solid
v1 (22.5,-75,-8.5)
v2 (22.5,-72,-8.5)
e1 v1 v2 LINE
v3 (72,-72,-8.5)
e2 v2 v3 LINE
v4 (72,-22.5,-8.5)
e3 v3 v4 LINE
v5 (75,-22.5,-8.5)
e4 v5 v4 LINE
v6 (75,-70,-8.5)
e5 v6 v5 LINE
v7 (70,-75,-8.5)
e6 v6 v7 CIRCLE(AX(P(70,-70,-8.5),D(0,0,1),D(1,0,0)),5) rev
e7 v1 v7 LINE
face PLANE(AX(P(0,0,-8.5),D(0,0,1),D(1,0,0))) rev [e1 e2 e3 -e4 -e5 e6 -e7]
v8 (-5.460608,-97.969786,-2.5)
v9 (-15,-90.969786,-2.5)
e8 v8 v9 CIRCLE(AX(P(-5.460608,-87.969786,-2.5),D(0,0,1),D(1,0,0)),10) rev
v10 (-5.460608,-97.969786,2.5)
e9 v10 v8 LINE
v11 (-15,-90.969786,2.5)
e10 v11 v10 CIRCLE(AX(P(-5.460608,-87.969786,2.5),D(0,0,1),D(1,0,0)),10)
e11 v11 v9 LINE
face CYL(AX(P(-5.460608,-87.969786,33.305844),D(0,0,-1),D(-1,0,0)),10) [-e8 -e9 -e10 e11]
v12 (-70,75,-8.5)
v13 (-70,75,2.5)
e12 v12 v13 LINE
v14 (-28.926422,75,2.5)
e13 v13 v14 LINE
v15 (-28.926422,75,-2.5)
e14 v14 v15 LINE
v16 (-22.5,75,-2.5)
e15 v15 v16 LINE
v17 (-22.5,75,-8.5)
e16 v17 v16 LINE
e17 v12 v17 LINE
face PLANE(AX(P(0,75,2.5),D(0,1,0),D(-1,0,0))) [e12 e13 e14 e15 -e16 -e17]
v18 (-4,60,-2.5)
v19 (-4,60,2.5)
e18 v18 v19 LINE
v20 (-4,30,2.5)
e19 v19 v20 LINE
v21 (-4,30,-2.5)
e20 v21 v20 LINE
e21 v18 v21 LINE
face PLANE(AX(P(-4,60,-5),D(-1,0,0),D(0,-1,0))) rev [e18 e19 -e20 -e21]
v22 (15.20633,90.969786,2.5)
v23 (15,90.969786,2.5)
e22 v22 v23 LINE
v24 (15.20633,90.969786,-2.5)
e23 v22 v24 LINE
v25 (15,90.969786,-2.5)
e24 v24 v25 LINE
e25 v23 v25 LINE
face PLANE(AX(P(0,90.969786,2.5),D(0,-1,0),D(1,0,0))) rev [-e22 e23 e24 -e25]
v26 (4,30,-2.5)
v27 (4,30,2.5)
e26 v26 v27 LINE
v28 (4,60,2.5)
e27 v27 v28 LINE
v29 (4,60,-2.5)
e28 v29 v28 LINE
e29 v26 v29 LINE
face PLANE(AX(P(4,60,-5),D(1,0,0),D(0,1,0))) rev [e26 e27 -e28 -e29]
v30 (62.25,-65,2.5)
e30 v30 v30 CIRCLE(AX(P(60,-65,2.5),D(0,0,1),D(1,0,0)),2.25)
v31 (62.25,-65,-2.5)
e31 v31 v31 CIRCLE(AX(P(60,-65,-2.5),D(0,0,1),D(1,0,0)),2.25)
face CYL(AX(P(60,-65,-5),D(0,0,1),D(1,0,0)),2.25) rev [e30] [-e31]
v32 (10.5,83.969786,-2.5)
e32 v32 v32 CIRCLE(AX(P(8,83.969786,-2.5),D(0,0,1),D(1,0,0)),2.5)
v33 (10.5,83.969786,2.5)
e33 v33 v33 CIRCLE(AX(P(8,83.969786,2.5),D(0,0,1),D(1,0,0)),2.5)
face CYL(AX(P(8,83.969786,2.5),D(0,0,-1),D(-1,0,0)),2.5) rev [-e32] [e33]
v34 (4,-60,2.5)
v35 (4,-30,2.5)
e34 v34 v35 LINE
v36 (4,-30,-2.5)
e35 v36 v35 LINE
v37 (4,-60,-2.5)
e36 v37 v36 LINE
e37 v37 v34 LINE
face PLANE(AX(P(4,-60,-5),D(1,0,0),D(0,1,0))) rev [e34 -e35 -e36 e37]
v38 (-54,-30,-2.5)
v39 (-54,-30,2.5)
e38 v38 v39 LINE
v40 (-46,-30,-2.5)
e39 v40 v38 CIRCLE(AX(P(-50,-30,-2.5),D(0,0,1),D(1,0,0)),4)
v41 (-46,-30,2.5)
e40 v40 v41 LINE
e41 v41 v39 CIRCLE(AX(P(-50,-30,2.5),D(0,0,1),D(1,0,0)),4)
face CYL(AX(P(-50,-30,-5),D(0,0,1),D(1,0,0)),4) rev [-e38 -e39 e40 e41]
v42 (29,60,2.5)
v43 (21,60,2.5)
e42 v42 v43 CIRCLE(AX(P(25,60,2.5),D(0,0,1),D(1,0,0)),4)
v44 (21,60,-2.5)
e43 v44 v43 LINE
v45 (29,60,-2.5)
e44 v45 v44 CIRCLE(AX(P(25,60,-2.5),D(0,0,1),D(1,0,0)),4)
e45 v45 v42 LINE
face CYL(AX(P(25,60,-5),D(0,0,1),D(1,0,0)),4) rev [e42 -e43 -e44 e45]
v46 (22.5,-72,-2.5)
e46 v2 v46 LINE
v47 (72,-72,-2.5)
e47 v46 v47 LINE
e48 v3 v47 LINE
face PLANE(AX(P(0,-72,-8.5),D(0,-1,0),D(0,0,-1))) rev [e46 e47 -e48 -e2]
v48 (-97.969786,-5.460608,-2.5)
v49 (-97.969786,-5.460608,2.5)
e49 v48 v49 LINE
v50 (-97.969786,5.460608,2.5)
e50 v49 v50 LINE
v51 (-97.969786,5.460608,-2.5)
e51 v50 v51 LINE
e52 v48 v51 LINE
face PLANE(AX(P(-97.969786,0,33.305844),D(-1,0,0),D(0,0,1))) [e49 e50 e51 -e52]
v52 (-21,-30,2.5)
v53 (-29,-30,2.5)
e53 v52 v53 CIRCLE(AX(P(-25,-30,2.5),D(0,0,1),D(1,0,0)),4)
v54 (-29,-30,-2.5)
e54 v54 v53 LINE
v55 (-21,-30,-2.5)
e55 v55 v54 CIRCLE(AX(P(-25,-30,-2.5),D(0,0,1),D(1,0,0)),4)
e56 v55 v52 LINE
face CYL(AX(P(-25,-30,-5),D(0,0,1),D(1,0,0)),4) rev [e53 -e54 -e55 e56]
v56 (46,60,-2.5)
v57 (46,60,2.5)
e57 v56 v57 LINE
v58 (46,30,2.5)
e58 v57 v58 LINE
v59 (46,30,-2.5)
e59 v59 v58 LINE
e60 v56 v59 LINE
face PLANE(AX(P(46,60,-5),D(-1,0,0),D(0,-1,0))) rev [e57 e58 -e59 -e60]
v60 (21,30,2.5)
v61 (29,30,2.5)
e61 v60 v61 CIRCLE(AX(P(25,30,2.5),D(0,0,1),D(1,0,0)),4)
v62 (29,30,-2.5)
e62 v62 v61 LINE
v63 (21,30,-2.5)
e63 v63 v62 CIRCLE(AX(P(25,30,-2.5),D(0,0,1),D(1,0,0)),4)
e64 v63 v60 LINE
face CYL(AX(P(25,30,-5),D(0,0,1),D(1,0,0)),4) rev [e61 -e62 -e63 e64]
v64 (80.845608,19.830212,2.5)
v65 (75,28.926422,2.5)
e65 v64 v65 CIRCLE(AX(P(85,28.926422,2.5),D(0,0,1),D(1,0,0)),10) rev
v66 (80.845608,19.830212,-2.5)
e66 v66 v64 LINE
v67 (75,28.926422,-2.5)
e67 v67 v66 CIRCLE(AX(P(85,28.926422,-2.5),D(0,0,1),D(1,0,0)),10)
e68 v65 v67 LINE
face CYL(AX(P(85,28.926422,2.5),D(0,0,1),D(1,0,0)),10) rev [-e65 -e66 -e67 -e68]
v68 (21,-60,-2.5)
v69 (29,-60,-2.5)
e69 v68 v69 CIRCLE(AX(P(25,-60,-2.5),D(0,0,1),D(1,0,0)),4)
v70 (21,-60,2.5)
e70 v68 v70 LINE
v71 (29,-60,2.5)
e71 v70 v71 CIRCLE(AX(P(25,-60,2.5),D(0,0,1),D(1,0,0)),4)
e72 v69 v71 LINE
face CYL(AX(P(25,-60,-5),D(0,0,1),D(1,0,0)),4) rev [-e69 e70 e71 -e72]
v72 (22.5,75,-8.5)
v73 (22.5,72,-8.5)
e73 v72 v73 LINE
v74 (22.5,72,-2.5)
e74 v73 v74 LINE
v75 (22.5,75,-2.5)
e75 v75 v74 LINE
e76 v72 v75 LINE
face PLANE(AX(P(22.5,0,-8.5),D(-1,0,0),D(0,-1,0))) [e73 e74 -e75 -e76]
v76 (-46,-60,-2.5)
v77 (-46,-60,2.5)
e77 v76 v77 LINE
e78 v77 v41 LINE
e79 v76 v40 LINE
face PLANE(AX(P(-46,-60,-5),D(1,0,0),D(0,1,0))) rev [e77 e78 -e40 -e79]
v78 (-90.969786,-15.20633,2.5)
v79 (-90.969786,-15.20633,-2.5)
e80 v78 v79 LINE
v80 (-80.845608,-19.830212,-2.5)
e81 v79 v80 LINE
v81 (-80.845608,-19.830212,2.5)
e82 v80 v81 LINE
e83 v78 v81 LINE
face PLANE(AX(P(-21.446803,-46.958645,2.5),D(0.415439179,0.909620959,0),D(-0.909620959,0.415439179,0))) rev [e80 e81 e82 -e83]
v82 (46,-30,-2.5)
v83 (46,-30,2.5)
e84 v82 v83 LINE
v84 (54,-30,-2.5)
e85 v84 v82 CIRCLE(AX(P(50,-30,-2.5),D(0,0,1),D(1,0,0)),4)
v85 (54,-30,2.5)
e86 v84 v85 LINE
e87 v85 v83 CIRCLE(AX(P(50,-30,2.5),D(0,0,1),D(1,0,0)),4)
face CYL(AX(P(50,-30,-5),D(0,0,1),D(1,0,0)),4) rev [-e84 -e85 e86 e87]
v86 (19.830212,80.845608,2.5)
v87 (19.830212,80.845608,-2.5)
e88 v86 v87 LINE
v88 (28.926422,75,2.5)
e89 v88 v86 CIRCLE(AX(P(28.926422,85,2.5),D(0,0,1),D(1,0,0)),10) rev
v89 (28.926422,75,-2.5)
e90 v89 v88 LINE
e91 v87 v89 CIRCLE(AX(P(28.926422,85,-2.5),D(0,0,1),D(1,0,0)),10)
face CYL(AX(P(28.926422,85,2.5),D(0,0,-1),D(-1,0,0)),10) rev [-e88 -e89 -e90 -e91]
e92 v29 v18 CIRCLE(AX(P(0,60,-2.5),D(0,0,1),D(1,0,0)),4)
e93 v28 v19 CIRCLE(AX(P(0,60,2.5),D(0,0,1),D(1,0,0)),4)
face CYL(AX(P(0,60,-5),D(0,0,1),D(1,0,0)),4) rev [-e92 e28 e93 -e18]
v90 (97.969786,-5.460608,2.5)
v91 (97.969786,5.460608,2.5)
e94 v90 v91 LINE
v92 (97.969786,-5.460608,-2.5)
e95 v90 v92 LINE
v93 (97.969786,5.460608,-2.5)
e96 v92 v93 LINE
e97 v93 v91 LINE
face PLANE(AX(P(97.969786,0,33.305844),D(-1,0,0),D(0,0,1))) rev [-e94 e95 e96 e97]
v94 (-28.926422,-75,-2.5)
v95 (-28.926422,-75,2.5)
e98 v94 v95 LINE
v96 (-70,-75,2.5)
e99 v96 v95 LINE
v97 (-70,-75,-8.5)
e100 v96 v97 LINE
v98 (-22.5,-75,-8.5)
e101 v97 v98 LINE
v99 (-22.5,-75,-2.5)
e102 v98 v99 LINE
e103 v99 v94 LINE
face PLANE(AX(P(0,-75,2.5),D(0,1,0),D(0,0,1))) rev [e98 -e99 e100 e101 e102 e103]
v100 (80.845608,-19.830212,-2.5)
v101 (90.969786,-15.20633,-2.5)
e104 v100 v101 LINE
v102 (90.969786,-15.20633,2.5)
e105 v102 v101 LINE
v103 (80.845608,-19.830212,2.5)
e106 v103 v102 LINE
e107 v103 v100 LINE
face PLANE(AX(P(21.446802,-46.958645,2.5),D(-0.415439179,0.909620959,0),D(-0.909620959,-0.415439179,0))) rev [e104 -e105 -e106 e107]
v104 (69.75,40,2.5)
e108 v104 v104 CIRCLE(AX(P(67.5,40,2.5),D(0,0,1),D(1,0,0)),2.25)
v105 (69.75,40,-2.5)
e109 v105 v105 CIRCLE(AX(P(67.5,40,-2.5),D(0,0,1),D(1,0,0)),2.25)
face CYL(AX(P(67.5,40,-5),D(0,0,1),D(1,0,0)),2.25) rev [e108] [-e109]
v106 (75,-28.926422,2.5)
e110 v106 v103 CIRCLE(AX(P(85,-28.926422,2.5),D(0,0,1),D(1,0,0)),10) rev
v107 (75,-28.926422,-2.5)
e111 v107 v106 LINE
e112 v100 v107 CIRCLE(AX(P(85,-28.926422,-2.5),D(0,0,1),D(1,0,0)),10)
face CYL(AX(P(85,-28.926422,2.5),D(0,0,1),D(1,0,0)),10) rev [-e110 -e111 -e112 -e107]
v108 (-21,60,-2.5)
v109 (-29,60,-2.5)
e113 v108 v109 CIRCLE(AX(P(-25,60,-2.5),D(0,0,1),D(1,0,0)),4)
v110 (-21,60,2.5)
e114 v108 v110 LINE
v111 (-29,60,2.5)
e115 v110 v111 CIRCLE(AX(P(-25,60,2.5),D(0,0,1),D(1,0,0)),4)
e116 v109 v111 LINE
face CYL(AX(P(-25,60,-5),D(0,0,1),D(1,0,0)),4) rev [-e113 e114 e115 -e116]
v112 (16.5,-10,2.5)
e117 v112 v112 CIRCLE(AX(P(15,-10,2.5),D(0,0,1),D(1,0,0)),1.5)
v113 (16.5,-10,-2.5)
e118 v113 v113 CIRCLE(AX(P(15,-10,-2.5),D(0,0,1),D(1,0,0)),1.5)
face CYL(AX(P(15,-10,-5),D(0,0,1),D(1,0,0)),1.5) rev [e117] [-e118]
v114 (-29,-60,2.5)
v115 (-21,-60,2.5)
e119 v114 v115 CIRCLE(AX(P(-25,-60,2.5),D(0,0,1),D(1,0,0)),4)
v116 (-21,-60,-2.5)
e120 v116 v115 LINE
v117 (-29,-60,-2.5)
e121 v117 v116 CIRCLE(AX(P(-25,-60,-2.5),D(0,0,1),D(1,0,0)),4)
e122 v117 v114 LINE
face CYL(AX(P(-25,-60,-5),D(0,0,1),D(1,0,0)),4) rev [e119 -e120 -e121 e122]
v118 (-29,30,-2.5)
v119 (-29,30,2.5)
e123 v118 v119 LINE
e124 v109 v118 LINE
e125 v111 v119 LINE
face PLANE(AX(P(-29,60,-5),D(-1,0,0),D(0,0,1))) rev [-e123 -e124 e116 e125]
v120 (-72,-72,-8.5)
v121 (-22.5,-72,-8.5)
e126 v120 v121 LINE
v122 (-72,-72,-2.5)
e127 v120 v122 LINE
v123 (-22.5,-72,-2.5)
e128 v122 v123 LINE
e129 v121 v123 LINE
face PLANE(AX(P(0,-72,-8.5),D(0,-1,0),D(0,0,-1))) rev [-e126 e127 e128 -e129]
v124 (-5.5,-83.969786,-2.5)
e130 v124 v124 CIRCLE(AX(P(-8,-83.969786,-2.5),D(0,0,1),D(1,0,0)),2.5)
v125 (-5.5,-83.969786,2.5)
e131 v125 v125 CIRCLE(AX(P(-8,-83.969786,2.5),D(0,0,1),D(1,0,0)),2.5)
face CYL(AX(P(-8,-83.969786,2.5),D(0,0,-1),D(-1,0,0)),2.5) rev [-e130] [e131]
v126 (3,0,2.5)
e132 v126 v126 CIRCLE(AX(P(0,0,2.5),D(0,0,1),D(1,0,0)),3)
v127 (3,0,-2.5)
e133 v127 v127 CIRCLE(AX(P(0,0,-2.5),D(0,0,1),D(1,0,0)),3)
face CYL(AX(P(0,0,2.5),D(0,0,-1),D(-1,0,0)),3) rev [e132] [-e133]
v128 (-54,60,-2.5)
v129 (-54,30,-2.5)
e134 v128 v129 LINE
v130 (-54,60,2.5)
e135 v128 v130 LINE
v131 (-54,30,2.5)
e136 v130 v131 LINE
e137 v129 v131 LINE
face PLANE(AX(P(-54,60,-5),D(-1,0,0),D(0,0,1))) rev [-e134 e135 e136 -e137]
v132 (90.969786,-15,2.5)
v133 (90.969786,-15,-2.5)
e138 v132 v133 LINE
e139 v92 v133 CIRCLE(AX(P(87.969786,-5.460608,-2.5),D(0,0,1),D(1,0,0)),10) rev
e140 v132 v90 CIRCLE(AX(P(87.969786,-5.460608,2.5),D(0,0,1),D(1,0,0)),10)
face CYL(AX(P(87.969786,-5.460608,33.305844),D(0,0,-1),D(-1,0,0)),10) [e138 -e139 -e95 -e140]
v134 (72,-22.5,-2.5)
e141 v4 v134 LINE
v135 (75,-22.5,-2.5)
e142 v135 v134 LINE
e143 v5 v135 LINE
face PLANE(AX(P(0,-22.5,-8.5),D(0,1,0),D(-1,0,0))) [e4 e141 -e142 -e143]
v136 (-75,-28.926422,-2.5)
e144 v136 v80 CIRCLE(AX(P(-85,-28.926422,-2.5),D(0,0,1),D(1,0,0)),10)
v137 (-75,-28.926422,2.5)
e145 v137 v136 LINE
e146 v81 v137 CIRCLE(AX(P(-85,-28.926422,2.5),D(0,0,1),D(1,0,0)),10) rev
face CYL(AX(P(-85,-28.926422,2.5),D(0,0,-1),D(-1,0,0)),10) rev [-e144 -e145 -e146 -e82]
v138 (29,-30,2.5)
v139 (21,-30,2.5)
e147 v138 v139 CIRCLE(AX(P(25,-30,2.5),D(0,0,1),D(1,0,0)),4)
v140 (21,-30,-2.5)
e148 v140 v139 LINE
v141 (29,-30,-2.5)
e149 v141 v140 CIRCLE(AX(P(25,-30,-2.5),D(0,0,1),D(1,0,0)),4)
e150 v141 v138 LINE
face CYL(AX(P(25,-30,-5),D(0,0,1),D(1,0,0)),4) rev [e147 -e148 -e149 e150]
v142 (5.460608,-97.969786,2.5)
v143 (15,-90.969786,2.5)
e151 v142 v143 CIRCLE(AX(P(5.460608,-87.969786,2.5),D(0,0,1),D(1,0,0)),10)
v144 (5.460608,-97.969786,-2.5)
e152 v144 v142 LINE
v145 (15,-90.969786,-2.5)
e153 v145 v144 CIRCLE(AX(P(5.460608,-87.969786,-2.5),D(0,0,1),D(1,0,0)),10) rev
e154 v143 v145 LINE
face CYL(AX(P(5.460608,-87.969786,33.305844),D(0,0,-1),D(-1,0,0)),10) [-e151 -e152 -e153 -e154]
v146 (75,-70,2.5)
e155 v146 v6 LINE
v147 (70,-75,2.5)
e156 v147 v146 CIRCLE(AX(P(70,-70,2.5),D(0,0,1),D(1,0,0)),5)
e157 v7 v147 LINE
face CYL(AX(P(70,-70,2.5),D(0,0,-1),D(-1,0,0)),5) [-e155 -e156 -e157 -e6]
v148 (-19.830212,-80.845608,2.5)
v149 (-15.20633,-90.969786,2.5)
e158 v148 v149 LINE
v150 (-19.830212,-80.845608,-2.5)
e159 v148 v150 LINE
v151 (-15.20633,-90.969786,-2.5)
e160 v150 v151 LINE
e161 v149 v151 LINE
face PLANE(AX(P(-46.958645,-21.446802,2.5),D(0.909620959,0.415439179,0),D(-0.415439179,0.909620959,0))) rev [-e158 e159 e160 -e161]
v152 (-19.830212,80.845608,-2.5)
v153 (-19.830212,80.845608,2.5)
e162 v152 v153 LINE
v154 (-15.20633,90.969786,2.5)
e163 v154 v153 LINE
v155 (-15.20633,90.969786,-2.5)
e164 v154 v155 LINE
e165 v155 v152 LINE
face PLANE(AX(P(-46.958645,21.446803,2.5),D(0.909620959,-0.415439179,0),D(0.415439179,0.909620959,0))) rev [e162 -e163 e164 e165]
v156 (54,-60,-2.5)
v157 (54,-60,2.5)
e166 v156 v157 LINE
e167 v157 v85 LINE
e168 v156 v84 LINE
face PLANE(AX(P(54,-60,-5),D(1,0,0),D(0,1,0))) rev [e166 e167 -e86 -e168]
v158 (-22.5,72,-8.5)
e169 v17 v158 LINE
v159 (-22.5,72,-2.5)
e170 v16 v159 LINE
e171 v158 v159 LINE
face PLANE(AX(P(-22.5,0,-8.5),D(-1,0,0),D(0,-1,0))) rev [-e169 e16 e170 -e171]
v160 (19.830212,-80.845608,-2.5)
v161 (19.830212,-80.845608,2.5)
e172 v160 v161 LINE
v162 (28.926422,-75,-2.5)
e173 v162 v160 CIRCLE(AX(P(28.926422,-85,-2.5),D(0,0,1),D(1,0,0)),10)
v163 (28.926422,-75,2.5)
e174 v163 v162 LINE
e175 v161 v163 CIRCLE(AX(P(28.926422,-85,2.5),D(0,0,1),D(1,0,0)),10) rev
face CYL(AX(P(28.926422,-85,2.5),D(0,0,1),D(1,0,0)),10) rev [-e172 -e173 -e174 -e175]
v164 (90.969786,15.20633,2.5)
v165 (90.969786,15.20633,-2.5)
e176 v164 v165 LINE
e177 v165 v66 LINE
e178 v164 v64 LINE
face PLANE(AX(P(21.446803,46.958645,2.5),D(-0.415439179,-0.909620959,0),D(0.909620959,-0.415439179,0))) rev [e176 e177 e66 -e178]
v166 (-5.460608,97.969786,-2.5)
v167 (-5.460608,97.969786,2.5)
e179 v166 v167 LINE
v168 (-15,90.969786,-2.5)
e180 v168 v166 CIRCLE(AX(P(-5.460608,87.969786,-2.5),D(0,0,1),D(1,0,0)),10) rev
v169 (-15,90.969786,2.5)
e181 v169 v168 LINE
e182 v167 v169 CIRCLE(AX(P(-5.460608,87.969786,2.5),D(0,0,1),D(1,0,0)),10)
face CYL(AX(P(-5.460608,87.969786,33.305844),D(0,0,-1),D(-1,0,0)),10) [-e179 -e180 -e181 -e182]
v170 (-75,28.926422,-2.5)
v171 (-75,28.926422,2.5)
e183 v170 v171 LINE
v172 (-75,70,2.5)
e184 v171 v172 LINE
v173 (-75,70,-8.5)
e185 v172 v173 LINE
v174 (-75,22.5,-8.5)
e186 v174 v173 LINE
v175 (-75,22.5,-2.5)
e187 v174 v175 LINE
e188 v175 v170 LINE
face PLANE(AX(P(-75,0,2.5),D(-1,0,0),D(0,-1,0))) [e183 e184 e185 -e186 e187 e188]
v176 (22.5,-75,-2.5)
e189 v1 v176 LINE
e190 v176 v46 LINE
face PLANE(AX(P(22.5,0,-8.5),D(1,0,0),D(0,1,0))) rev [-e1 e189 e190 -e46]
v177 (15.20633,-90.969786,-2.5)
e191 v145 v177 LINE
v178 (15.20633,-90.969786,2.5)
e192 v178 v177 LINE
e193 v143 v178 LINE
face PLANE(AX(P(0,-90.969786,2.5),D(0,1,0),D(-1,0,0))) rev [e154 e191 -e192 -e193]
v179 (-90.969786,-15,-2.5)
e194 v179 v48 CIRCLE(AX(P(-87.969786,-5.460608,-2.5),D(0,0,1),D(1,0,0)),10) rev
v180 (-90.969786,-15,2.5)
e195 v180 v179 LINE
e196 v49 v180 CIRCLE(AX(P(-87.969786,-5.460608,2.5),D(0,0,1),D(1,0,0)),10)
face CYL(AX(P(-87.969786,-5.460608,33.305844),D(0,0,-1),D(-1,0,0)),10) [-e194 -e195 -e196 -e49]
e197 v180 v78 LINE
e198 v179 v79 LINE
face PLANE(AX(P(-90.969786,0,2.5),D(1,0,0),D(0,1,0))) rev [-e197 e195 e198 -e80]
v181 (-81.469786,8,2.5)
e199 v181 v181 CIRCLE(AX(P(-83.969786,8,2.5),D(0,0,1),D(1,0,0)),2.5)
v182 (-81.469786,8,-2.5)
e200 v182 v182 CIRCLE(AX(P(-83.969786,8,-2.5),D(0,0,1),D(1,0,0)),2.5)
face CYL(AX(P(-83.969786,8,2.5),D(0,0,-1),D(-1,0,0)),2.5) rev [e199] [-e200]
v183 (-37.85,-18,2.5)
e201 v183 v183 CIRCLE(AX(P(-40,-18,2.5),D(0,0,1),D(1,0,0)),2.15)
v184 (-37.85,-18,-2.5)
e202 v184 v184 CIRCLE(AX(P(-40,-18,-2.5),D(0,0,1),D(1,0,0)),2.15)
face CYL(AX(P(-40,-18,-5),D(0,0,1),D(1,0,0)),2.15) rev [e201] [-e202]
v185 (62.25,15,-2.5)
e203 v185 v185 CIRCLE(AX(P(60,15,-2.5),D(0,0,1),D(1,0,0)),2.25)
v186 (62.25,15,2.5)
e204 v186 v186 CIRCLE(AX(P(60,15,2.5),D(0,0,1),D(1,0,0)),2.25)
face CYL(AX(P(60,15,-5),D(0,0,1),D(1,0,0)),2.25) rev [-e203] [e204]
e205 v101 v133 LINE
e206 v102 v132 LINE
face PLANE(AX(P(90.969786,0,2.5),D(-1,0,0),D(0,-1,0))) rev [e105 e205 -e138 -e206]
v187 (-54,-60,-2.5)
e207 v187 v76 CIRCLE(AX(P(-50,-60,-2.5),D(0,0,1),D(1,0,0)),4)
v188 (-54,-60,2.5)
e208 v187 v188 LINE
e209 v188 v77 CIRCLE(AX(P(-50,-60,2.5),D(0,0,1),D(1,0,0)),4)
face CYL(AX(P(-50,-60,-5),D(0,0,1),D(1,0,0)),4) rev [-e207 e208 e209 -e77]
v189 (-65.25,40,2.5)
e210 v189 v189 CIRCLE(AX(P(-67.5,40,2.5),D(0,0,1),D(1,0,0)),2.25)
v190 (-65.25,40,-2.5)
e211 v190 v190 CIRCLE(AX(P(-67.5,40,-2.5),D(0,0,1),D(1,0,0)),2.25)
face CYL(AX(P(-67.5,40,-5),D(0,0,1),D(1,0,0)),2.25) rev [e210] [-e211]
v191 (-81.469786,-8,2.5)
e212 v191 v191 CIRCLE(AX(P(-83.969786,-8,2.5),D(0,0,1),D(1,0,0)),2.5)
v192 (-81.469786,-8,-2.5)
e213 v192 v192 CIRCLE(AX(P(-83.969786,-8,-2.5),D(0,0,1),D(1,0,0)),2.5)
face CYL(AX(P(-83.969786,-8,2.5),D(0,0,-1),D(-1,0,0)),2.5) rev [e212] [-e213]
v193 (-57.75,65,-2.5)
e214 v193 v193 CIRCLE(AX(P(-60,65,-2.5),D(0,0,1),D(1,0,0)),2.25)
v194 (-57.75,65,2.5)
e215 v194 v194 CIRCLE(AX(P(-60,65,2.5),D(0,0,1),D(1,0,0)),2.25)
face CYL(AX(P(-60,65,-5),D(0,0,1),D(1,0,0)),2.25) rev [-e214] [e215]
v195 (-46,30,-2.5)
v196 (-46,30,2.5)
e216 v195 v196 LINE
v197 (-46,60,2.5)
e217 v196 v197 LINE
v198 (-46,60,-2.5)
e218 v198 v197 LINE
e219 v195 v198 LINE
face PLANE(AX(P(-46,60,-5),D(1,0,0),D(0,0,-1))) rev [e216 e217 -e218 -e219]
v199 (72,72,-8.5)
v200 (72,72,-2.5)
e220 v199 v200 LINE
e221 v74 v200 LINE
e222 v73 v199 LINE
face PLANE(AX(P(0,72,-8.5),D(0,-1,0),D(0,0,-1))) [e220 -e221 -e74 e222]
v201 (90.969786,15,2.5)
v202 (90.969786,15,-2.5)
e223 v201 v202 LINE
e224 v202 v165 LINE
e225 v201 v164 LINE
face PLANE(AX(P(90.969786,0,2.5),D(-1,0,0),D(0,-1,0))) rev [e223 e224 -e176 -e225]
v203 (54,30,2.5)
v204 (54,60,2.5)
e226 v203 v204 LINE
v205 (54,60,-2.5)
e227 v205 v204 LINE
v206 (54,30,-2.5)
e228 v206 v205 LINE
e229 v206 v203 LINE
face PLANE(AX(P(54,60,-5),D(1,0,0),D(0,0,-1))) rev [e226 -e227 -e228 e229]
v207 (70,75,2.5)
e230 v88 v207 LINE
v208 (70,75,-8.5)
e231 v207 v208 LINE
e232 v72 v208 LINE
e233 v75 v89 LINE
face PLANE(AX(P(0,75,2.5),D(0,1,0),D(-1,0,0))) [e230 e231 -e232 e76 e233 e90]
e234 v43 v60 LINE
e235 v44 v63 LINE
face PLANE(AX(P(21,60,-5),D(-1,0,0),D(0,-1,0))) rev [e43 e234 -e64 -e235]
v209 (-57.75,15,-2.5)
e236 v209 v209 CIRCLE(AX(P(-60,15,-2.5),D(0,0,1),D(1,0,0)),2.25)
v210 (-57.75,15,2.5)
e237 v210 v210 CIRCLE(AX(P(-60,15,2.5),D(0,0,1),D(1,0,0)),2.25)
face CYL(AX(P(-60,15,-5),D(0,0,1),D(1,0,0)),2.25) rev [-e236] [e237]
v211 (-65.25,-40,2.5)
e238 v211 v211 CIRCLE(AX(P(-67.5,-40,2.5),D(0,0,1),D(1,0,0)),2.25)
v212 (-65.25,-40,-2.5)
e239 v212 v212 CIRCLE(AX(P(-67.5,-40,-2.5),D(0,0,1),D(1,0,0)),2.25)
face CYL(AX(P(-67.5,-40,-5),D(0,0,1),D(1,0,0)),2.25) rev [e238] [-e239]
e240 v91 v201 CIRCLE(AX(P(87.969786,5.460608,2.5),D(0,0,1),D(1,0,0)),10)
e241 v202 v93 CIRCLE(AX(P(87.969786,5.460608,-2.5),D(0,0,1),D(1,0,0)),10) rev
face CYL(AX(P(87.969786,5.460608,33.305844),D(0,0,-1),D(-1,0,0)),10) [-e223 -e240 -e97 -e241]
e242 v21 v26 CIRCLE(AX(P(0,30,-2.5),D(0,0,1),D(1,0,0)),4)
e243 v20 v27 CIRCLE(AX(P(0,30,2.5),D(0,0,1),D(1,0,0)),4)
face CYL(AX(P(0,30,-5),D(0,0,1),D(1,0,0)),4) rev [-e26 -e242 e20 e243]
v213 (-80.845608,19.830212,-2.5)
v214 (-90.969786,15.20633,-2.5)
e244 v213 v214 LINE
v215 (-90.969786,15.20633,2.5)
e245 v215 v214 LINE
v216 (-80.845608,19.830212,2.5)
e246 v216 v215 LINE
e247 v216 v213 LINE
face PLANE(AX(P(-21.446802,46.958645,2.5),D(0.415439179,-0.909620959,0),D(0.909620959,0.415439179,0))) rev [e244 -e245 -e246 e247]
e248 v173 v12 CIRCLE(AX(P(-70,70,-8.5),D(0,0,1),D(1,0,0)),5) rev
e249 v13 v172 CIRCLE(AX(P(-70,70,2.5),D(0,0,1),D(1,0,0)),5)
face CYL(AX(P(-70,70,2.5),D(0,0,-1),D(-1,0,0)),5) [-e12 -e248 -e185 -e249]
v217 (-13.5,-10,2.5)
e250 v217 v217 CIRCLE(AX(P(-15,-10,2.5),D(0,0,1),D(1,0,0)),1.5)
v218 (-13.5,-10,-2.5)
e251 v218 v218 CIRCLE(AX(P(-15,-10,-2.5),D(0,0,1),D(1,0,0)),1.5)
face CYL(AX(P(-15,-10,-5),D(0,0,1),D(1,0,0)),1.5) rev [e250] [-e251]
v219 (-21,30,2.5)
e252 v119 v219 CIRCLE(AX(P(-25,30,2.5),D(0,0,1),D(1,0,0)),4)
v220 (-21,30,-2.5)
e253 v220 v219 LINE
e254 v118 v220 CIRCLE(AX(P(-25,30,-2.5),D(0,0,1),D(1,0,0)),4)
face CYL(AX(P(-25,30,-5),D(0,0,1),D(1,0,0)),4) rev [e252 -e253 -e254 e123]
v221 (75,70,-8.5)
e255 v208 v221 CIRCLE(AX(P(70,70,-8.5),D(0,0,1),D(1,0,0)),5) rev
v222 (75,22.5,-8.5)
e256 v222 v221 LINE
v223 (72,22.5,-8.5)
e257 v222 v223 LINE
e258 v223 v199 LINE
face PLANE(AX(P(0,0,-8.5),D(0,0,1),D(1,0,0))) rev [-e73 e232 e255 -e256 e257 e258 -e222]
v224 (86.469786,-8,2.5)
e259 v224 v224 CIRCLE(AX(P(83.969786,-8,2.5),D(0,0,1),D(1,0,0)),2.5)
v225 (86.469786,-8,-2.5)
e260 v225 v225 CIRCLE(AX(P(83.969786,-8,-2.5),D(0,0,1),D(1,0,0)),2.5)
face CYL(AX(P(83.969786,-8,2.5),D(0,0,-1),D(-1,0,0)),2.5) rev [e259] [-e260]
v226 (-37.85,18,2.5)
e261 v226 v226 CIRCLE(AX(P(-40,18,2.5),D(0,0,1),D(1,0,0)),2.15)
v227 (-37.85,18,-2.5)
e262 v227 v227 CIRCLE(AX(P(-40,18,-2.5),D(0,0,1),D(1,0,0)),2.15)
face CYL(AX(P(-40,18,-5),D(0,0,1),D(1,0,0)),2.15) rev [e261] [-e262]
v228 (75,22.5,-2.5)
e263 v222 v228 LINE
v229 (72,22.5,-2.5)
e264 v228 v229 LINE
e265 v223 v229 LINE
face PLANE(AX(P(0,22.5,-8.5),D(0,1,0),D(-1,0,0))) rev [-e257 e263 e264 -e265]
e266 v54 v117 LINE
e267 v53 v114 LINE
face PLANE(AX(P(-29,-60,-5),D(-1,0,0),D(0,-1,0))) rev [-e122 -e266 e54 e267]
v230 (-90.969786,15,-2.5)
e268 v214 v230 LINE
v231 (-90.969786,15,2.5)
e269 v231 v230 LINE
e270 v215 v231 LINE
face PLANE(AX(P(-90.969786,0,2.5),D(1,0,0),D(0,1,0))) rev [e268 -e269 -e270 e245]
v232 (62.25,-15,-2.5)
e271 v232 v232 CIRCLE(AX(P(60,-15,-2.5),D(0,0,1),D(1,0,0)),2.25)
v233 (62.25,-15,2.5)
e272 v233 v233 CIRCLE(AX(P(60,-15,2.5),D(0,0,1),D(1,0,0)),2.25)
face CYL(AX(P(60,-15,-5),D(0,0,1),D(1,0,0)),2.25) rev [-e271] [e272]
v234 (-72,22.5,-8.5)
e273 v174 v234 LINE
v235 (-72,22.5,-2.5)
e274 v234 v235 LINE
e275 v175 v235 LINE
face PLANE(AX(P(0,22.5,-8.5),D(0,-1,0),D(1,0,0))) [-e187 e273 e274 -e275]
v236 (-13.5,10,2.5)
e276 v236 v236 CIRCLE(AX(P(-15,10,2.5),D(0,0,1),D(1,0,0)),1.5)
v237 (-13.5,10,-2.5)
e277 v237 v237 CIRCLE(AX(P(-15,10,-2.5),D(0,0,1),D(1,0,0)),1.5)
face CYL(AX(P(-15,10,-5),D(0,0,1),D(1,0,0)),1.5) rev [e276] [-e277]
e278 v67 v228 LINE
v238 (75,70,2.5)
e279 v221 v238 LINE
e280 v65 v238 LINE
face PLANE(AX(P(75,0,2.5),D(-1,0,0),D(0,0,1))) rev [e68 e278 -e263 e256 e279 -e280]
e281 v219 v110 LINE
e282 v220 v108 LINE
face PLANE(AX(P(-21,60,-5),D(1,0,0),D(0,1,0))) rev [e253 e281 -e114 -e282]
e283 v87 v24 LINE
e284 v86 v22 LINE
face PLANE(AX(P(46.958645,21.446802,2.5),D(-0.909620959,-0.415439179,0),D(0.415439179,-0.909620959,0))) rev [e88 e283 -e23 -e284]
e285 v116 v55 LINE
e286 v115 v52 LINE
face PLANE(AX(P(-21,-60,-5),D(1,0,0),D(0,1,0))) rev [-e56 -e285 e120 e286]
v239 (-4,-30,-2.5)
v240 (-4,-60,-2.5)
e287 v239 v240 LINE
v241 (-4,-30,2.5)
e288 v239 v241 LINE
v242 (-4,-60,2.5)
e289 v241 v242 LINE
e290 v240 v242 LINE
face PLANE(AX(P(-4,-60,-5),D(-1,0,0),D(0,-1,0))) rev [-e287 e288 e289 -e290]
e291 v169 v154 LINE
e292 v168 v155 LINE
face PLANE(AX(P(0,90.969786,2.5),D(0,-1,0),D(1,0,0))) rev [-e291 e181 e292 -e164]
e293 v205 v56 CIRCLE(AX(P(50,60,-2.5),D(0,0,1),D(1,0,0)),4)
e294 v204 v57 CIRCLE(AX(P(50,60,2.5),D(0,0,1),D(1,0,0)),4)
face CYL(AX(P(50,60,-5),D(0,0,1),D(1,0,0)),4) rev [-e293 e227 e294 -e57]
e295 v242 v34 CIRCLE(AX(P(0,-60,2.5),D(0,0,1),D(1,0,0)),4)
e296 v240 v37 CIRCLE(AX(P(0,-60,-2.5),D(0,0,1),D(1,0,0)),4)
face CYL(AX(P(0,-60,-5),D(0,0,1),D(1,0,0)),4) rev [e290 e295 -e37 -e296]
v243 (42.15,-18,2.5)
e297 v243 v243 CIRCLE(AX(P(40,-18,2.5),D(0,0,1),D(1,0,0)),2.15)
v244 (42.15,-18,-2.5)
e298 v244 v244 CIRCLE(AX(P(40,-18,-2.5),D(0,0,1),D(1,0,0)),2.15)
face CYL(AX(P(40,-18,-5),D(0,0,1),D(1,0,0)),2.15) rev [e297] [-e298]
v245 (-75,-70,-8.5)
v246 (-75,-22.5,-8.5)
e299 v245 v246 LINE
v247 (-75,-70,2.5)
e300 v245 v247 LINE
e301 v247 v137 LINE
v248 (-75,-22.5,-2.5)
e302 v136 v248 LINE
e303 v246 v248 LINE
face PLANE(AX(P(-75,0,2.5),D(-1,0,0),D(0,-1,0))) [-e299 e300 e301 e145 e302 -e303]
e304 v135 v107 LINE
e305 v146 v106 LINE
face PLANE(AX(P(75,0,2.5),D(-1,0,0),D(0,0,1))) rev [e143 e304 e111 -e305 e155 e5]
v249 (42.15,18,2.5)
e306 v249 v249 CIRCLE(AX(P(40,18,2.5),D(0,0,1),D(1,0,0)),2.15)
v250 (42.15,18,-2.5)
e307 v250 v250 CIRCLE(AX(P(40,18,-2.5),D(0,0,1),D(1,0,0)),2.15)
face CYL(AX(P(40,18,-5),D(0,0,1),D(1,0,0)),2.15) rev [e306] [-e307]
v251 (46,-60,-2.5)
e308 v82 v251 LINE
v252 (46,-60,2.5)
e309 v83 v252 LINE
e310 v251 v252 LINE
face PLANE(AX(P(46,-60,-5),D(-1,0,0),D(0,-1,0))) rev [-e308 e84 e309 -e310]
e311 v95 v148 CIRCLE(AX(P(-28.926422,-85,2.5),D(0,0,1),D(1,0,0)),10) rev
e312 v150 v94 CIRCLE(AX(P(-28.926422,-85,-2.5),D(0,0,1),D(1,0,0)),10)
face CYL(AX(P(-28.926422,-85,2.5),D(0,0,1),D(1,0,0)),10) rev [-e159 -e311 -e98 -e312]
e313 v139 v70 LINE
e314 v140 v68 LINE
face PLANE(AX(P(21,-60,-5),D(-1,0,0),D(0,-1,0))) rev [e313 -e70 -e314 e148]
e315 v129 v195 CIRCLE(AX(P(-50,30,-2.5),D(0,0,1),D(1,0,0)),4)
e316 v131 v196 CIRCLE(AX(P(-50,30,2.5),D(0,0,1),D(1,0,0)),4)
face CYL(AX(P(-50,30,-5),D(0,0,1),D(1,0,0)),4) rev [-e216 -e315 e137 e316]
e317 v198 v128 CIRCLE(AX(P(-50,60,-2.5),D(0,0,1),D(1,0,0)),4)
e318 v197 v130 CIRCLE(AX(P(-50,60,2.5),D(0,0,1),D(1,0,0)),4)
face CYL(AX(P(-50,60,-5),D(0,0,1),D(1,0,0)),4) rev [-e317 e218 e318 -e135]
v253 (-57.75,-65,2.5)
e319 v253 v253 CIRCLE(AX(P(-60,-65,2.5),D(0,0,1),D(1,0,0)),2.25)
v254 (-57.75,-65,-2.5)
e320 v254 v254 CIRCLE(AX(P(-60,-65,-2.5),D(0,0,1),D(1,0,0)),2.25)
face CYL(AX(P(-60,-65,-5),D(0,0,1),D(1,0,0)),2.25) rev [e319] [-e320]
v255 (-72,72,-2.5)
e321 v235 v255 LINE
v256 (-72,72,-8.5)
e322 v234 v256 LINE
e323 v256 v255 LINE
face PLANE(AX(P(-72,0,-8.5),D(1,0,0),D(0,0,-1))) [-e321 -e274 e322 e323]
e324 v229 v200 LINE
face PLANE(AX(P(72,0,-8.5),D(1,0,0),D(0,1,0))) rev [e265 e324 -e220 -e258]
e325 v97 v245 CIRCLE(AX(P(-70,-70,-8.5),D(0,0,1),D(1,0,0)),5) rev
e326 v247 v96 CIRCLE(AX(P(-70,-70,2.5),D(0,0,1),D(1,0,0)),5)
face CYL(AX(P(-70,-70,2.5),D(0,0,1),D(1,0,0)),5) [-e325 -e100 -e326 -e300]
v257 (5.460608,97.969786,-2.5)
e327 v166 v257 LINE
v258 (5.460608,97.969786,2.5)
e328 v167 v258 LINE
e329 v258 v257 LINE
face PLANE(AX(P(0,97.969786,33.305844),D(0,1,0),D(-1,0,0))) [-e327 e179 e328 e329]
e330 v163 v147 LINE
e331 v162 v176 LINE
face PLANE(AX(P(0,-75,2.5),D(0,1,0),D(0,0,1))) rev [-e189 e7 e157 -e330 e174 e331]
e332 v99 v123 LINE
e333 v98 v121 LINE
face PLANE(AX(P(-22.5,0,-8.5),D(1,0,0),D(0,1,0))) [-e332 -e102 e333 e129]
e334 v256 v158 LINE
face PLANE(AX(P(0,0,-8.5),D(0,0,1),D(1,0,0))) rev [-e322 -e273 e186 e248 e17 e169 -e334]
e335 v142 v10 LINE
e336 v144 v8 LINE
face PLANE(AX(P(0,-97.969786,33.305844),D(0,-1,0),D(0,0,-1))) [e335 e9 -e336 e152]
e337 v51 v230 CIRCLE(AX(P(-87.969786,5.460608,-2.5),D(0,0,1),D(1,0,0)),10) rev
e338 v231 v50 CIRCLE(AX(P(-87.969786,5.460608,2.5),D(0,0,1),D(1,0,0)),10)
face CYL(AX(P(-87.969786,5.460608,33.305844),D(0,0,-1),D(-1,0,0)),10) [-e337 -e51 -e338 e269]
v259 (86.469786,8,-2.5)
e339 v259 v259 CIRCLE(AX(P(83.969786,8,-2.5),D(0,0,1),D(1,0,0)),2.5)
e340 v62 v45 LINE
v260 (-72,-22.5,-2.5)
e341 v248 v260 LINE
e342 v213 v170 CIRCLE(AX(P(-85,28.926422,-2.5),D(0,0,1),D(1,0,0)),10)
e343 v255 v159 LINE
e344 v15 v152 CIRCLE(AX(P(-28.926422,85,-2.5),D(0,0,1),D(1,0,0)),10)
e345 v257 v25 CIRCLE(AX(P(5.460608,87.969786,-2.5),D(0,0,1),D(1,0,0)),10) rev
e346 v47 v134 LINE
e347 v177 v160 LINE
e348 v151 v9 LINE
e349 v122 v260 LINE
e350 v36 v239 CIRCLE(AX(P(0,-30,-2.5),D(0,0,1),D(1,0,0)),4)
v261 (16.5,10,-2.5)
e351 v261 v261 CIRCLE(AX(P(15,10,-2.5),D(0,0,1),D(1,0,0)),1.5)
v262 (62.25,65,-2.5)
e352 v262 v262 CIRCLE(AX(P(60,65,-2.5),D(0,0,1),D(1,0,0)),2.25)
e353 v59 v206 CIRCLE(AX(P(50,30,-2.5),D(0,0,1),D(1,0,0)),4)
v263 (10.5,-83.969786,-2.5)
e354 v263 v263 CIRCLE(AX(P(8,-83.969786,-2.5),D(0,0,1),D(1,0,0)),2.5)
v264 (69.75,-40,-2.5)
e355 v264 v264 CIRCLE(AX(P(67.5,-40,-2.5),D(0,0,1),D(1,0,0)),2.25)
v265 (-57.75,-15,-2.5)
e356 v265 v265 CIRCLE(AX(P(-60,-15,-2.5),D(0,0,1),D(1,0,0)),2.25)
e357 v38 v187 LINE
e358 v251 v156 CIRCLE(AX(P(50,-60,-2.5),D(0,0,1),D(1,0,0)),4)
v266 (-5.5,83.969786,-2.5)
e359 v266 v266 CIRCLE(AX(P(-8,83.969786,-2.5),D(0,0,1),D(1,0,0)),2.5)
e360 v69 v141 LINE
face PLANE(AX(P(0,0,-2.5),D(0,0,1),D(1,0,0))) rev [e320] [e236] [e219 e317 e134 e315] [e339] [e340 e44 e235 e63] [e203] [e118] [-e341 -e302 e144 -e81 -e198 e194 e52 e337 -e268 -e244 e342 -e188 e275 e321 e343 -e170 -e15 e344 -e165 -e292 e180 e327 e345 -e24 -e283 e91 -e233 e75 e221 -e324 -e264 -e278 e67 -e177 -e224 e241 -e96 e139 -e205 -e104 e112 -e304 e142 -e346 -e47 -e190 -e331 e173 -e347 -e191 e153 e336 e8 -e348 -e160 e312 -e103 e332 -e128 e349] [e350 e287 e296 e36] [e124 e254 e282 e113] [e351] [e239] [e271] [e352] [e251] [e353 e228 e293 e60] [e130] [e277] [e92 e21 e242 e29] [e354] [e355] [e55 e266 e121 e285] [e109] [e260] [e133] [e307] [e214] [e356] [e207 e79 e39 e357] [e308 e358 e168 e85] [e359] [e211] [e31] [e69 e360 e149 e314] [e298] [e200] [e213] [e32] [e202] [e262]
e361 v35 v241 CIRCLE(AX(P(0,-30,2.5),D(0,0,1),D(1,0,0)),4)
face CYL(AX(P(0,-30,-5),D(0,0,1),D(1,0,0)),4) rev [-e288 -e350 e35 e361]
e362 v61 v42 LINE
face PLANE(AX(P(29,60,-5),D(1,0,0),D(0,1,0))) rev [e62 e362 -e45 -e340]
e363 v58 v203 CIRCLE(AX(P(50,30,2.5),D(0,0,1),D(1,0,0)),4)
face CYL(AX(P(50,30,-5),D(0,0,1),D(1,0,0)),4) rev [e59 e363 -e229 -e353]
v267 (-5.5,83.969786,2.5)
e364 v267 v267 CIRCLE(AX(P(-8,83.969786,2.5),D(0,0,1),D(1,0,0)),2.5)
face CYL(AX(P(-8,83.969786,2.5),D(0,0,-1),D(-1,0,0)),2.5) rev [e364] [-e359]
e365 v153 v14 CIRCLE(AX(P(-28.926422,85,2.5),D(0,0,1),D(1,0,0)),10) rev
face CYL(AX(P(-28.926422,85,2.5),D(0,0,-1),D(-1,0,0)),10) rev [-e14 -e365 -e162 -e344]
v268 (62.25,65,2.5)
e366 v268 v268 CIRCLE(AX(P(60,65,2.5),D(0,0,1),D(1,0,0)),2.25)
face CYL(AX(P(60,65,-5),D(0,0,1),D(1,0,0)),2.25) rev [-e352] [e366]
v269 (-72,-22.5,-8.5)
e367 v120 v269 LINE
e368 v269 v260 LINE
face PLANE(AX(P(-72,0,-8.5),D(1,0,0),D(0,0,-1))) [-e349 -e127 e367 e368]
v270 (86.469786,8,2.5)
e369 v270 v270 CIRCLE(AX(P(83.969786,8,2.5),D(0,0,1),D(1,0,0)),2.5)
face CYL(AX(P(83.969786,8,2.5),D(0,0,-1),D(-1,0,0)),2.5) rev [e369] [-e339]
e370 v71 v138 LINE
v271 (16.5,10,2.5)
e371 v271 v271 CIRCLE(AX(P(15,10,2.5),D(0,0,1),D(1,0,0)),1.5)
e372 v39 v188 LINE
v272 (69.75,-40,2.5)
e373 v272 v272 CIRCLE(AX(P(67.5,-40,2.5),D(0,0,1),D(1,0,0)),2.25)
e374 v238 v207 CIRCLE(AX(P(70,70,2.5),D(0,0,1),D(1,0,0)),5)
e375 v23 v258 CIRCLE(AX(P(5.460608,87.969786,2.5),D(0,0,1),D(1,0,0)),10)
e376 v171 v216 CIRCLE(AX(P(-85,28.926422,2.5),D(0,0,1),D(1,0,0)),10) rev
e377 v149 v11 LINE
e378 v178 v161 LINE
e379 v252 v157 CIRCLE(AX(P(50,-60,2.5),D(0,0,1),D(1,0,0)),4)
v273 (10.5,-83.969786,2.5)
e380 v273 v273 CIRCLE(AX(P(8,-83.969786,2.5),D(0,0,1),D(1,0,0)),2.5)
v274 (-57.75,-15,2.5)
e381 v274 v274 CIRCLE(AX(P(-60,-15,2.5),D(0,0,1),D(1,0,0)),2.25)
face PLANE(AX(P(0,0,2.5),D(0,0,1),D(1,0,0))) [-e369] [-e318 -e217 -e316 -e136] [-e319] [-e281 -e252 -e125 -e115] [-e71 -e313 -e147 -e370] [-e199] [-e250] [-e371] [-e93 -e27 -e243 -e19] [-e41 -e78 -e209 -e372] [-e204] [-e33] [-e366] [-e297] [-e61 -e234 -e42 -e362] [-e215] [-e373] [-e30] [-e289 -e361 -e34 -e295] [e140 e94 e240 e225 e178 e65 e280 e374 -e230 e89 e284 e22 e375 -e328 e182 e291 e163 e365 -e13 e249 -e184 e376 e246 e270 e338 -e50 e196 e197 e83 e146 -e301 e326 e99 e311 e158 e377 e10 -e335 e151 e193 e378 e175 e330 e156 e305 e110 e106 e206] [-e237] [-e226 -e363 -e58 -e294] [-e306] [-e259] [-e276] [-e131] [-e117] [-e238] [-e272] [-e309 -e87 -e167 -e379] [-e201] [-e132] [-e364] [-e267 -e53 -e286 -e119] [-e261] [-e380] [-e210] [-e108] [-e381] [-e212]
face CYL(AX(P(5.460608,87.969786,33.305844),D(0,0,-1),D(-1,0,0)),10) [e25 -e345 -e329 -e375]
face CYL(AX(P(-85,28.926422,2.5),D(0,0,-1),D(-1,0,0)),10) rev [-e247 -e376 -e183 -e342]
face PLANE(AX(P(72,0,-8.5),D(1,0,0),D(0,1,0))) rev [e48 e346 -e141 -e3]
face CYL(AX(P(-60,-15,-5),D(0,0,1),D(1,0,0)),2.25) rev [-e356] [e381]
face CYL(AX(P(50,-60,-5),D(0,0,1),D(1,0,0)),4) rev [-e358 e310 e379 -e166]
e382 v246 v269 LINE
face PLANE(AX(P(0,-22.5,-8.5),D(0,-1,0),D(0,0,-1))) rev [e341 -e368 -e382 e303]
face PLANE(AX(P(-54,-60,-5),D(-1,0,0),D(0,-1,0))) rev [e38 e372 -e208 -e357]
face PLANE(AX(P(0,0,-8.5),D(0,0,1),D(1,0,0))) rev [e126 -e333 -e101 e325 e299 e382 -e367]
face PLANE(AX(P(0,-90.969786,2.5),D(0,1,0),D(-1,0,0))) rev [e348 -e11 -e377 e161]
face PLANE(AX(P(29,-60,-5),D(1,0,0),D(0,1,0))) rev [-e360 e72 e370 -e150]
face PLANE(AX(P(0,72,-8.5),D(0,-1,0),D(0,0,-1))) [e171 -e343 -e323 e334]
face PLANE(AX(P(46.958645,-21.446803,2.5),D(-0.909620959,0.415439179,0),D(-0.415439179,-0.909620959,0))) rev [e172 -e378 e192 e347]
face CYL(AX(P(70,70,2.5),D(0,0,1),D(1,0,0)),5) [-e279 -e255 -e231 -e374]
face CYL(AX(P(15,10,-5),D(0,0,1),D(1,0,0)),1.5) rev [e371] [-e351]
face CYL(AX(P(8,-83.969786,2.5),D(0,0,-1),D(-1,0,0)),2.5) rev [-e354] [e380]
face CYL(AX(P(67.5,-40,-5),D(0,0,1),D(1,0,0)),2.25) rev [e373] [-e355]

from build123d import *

# Parameters (mm, degrees)
SKETCH1_R           = 3
SKETCH1_R_2         = 2.5
SKETCH1_W           = 3
SKETCH1_H           = 12
SKETCH1_W_2         = 21
SKETCH1_H_2         = 3
SKETCH1_H_3         = 8
SKETCH1_W_3         = 12
SKETCH1_H_4         = 21
SKETCH1_W_4         = 8
BOSS_EXTRUDE1_DEPTH = 2.5
BOSS_EXTRUDE3_START = -8.5
BOSS_EXTRUDE3_DEPTH = 6
SKETCH6_R           = 2.15
SKETCH6_R_2         = 1.5
CUT_EXTRUDE3_DEPTH  = 5
BOSS_EXTRUDE4_START = -2.5
SKETCH7_W           = 7
SKETCH7_H           = 30
SKETCH7_W_2         = 30
SKETCH7_H_2         = 7
BOSS_EXTRUDE4_DEPTH = 5
FILLET1_R           = 10
FILLET3_R           = 5
SKETCH9_R           = 2.25
CUT_EXTRUDE4_DEPTH  = 5


with BuildPart() as part:
    # Sketch1 → Boss-Extrude1 (new, symmetric)
    # profile 1 of 31: a face of its own
    with BuildSketch(Plane.XY):
        Polygon((-72, -72), (-22.500000003, -72), (-10.500000004, -72), (-10.500000004, -64), (10.499999996, -64), (10.499999996, -72), (22.499999996, -72), (72, -72), (72, -22.500000003), (72, -10.500000004), (64, -10.500000004), (64, 10.499999996), (72, 10.499999996), (72, 22.499999996), (72, 72), (22.500000003, 72), (10.500000004, 72), (10.500000004, 64), (-10.499999996, 64), (-10.499999996, 72), (-22.499999996, 72), (-45, 72), (-72, 72), (-72, 45), (-72, 22.500000003), (-72, 10.500000004), (-64, 10.500000004), (-64, -10.499999996), (-72, -10.499999996), (-72, -22.499999996), align=None)
        Circle(SKETCH1_R, mode=Mode.SUBTRACT)
    # profile 2 of 31: a face of its own
    with BuildSketch(Plane.XY):
        Polygon((-90, 15.649247909), (-90, -15.649247896), (-74.99999999, -22.499999996), (-75, -10.499999996), (-75, 10.500000004), (-75, 22.500000003), align=None)
        with Locations((-83.969786151, -7.999999996)):
            Circle(SKETCH1_R_2, mode=Mode.SUBTRACT)
        with Locations((-83.969786151, 8.000000004)):
            Circle(SKETCH1_R_2, mode=Mode.SUBTRACT)
    # profile 3 of 31: a face of its own
    with BuildSketch(Plane.XY):
        Polygon((-72, 22.500000003), (-74.99999999, 22.500000003), (-75, 10.500000004), (-72, 10.500000004), align=None)
    # profile 4 of 31: a face of its own
    with BuildSketch(Plane.XY):
        Polygon((-75, 26.557364843), (-75, 22.500000003), (-72, 22.500000003), (-72, 45), (-75, 45), align=None)
    # profile 5 of 31: a face of its own
    with BuildSketch(Plane.XY):
        with Locations((-73.5, -16.499999996)):
            Rectangle(SKETCH1_W, SKETCH1_H)
    # profile 6 of 31: a face of its own
    with BuildSketch(Plane.XY):
        Polygon((-75, -75), (-22.500000003, -75), (-22.500000003, -72), (-72, -72), (-72, -22.499999996), (-74.99999999, -22.499999996), (-75, -24.91224327), align=None)
    # profile 7 of 31: a face of its own
    with BuildSketch(Plane.XY):
        Polygon((-22.500000003, -74.99999999), (-15.649247909, -90), (15.649247896, -90), (22.499999996, -74.99999999), (10.499999996, -75), (-10.500000004, -75), align=None)
        with Locations((-8.000000004, -83.969786151)):
            Circle(SKETCH1_R_2, mode=Mode.SUBTRACT)
        with Locations((7.999999996, -83.969786151)):
            Circle(SKETCH1_R_2, mode=Mode.SUBTRACT)
    # profile 8 of 31: a face of its own
    with BuildSketch(Plane.XY):
        Polygon((-22.500000003, -72), (-22.500000003, -74.99999999), (-10.500000004, -75), (-10.500000004, -72), align=None)
    # profile 9 of 31: a face of its own
    with BuildSketch(Plane.XY):
        with Locations((-4e-09, -73.5)):
            Rectangle(SKETCH1_W_2, SKETCH1_H_2)
    # profile 10 of 31: a face of its own
    with BuildSketch(Plane.XY):
        with Locations((-4e-09, -68)):
            Rectangle(SKETCH1_W_2, SKETCH1_H_3)
    # profile 11 of 31: a face of its own
    with BuildSketch(Plane.XY):
        with Locations((16.499999996, -73.5)):
            Rectangle(SKETCH1_W_3, SKETCH1_H_2)
    # profile 12 of 31: a face of its own
    with BuildSketch(Plane.XY):
        Polygon((22.499999996, -72), (22.499999996, -74.99999999), (75, -75), (75, -22.500000003), (72, -22.500000003), (72, -72), align=None)
    # profile 13 of 31: a face of its own
    with BuildSketch(Plane.XY):
        Polygon((15.649247896, -90), (-15.649247909, -90), (-15.206330276, -90.969786151), (15.206330267, -90.969786141), align=None)
    # profile 14 of 31: a face of its own
    with BuildSketch(Plane.XY):
        Polygon((72, -22.500000003), (74.99999999, -22.500000003), (75, -10.500000004), (72, -10.500000004), align=None)
    # profile 15 of 31: a face of its own
    with BuildSketch(Plane.XY):
        Polygon((74.99999999, -22.500000003), (90, -15.649247909), (90, 15.649247896), (74.99999999, 22.499999996), (75, 10.499999996), (75, -10.500000004), align=None)
        with Locations((83.969786151, -8.000000004)):
            Circle(SKETCH1_R_2, mode=Mode.SUBTRACT)
        with Locations((83.969786151, 7.999999996)):
            Circle(SKETCH1_R_2, mode=Mode.SUBTRACT)
    # profile 16 of 31: a face of its own
    with BuildSketch(Plane.XY):
        Polygon((90, 15.649247896), (90, -15.649247909), (90.969786151, -15.206330276), (90.969786141, 15.206330267), align=None)
    # profile 17 of 31: a face of its own
    with BuildSketch(Plane.XY):
        with Locations((73.5, -4e-09)):
            Rectangle(SKETCH1_W, SKETCH1_H_4)
    # profile 18 of 31: a face of its own
    with BuildSketch(Plane.XY):
        with Locations((68, -4e-09)):
            Rectangle(SKETCH1_W_4, SKETCH1_H_4)
    # profile 19 of 31: a face of its own
    with BuildSketch(Plane.XY):
        with Locations((73.5, 16.499999996)):
            Rectangle(SKETCH1_W, SKETCH1_H)
    # profile 20 of 31: a face of its own
    with BuildSketch(Plane.XY):
        Polygon((72, 22.499999996), (74.99999999, 22.499999996), (75, 75), (22.500000003, 75), (22.500000003, 72), (72, 72), align=None)
    # profile 21 of 31: a face of its own
    with BuildSketch(Plane.XY):
        Polygon((22.500000003, 72), (22.500000003, 74.99999999), (10.500000004, 75), (10.500000004, 72), align=None)
    # profile 22 of 31: a face of its own
    with BuildSketch(Plane.XY):
        Polygon((15.649247909, 90), (-15.649247896, 90), (-22.499999996, 74.99999999), (-10.499999996, 75), (10.500000004, 75), (22.500000003, 75), align=None)
        with Locations((-7.999999996, 83.969786151)):
            Circle(SKETCH1_R_2, mode=Mode.SUBTRACT)
        with Locations((8.000000004, 83.969786151)):
            Circle(SKETCH1_R_2, mode=Mode.SUBTRACT)
    # profile 23 of 31: a face of its own
    with BuildSketch(Plane.XY):
        with Locations((-16.499999996, 73.5)):
            Rectangle(SKETCH1_W_3, SKETCH1_H_2)
    # profile 24 of 31: a face of its own
    with BuildSketch(Plane.XY):
        with Locations((4e-09, 73.5)):
            Rectangle(SKETCH1_W_2, SKETCH1_H_2)
    # profile 25 of 31: a face of its own
    with BuildSketch(Plane.XY):
        Polygon((-15.206330267, 90.969786141), (-15.649247896, 90), (15.649247909, 90), (15.206330276, 90.969786151), align=None)
    # profile 26 of 31: a face of its own
    with BuildSketch(Plane.XY):
        Polygon((-22.499999996, 72), (-22.499999996, 74.99999999), (-45, 75), (-45, 72), align=None)
    # profile 27 of 31: a face of its own
    with BuildSketch(Plane.XY):
        with Locations((4e-09, 68)):
            Rectangle(SKETCH1_W_2, SKETCH1_H_3)
    # profile 28 of 31: a face of its own
    with BuildSketch(Plane.XY):
        Polygon((-75, 75), (-75, 45), (-72, 45), (-72, 72), (-45, 72), (-45, 75), align=None)
    # profile 29 of 31: a face of its own
    with BuildSketch(Plane.XY):
        with Locations((-68, 4e-09)):
            Rectangle(SKETCH1_W_4, SKETCH1_H_4)
    # profile 30 of 31: a face of its own
    with BuildSketch(Plane.XY):
        with Locations((-73.5, 4e-09)):
            Rectangle(SKETCH1_W, SKETCH1_H_4)
    # profile 31 of 31: a face of its own
    with BuildSketch(Plane.XY):
        Polygon((-90.969786141, -15.206330267), (-90, -15.649247896), (-90, 15.649247909), (-90.969786151, 15.206330276), align=None)
    extrude(amount=BOSS_EXTRUDE1_DEPTH, both=True)

    # Sketch1<4> → Boss-Extrude3 (add)
    with BuildSketch(Plane.XY.offset(BOSS_EXTRUDE3_START)):
        Polygon((-75, -75), (-22.500000003, -75), (-22.500000003, -72), (-72, -72), (-72, -22.499999996), (-74.99999999, -22.499999996), align=None)
        Polygon((22.499999996, -72), (22.499999996, -74.99999999), (75, -75), (75, -22.500000003), (72, -22.500000003), (72, -72), align=None)
        Polygon((-75, 45), (-74.99999999, 22.500000003), (-72, 22.500000003), (-72, 72), (-22.499999996, 72), (-22.499999996, 74.99999999), (-75, 75), align=None)
        Polygon((72, 22.499999996), (74.99999999, 22.499999996), (75, 75), (22.500000003, 75), (22.500000003, 72), (72, 72), align=None)
    extrude(amount=BOSS_EXTRUDE3_DEPTH)

    # Sketch6 → Cut-Extrude3 (cut, symmetric)
    with BuildSketch(Plane.XY):
        with Locations((40, 18)):
            Circle(SKETCH6_R)
        with Locations((-40, 18)):
            Circle(SKETCH6_R)
        with Locations((40, -18)):
            Circle(SKETCH6_R)
        with Locations((-40, -18)):
            Circle(SKETCH6_R)
        with Locations((-15, 10)):
            Circle(SKETCH6_R_2)
        with Locations((-15, -10)):
            Circle(SKETCH6_R_2)
        with Locations((15, -10)):
            Circle(SKETCH6_R_2)
        with Locations((15, 10)):
            Circle(SKETCH6_R_2)
        with BuildLine():
            Line((-46, 60), (-46, 30))
            ThreePointArc((-46, 30), (-50, 26), (-54, 30))
            Line((-54, 30), (-54, 60))
            ThreePointArc((-54, 60), (-50, 64), (-46, 60))
        make_face()
        with BuildLine():
            Line((-21, 60), (-21, 30))
            ThreePointArc((-21, 30), (-25, 26), (-29, 30))
            Line((-29, 30), (-29, 60))
            ThreePointArc((-29, 60), (-25, 64), (-21, 60))
        make_face()
        with BuildLine():
            Line((4, 60), (4, 30))
            ThreePointArc((4, 30), (0, 26), (-4, 30))
            Line((-4, 30), (-4, 60))
            ThreePointArc((-4, 60), (0, 64), (4, 60))
        make_face()
        with BuildLine():
            Line((29, 60), (29, 30))
            ThreePointArc((29, 30), (25, 26), (21, 30))
            Line((21, 30), (21, 60))
            ThreePointArc((21, 60), (25, 64), (29, 60))
        make_face()
        with BuildLine():
            Line((54, 60), (54, 30))
            ThreePointArc((54, 30), (50, 26), (46, 30))
            Line((46, 30), (46, 60))
            ThreePointArc((46, 60), (50, 64), (54, 60))
        make_face()
        with BuildLine():
            Line((-46, -60), (-46, -30))
            ThreePointArc((-46, -30), (-50, -26), (-54, -30))
            Line((-54, -30), (-54, -60))
            ThreePointArc((-54, -60), (-50, -64), (-46, -60))
        make_face()
        with BuildLine():
            Line((-21, -60), (-21, -30))
            ThreePointArc((-21, -30), (-25, -26), (-29, -30))
            Line((-29, -30), (-29, -60))
            ThreePointArc((-29, -60), (-25, -64), (-21, -60))
        make_face()
        with BuildLine():
            Line((4, -60), (4, -30))
            ThreePointArc((4, -30), (0, -26), (-4, -30))
            Line((-4, -30), (-4, -60))
            ThreePointArc((-4, -60), (0, -64), (4, -60))
        make_face()
        with BuildLine():
            Line((29, -60), (29, -30))
            ThreePointArc((29, -30), (25, -26), (21, -30))
            Line((21, -30), (21, -60))
            ThreePointArc((21, -60), (25, -64), (29, -60))
        make_face()
        with BuildLine():
            Line((54, -60), (54, -30))
            ThreePointArc((54, -30), (50, -26), (46, -30))
            Line((46, -30), (46, -60))
            ThreePointArc((46, -60), (50, -64), (54, -60))
        make_face()
    extrude(amount=CUT_EXTRUDE3_DEPTH, both=True, mode=Mode.SUBTRACT)

    # Sketch7 → Boss-Extrude4 (add)
    with BuildSketch(Plane.XY.offset(BOSS_EXTRUDE4_START)):
        with Locations((-94.469786151, 0)):
            Rectangle(SKETCH7_W, SKETCH7_H)
        with Locations((0, 94.469786151)):
            Rectangle(SKETCH7_W_2, SKETCH7_H_2)
        with Locations((94.469786151, 0)):
            Rectangle(SKETCH7_W, SKETCH7_H)
        with Locations((0, -94.469786151)):
            Rectangle(SKETCH7_W_2, SKETCH7_H_2)
    extrude(amount=BOSS_EXTRUDE4_DEPTH)

    # Fillet1
    # the kernel refuses this fillet: 10 mm, written as the material it adds along each edge
    with BuildSketch(Plane(origin=(22.499999996, -74.999999995, 2.5), x_dir=(-0.4154391795205238, -0.9096209584872779, 0), z_dir=(0, 0, -1)), Plane(origin=(74.999999995, 22.499999996, 2.5), x_dir=(0.9096209584872752, -0.41543917952052956, 0), z_dir=(0, 0, -1)), Plane(origin=(-74.999999995, -22.499999996, 2.5), x_dir=(-0.9096209584872703, 0.4154391795205402, 0), z_dir=(0, 0, -1)), Plane(origin=(-22.499999996, 74.999999995, 2.5), x_dir=(0.41543917952053416, 0.9096209584872732, 0), z_dir=(0, 0, -1))) as fillet1_piece_1:
        with BuildLine():
            CenterArc((FILLET1_R * 0.642642207755, -FILLET1_R), FILLET1_R, 89.999999981, 65.453023266)
            Line((-FILLET1_R * 0.266978750732, -FILLET1_R * 0.584560820479), (0, 0))
            Line((0, 0), (FILLET1_R * 0.642642208081, 0))
        make_face()
    extrude(amount=5)
    with BuildSketch(Plane(origin=(22.500000003, 74.999999995, 2.5), x_dir=(-0.4154391792289252, 0.9096209586204558, 0), z_dir=(0, 0, -1)), Plane(origin=(74.999999995, -22.500000003, 2.5), x_dir=(0.9096209586204533, 0.41543917922893076, 0), z_dir=(0, 0, -1)), Plane(origin=(-22.500000003, -74.999999995, 2.5), x_dir=(0.41543917922898005, -0.9096209586204307, 0), z_dir=(0, 0, -1)), Plane(origin=(-74.999999995, 22.500000003, 2.5), x_dir=(-0.9096209586204577, -0.4154391792289213, 0), z_dir=(0, 0, -1))) as fillet1_piece_2:
        with BuildLine():
            CenterArc((FILLET1_R * 0.642642207982, FILLET1_R), FILLET1_R, 204.546976734, 65.453023285)
            Line((-FILLET1_R * 0.266978750639, FILLET1_R * 0.584560820771), (0, 0))
            Line((0, 0), (FILLET1_R * 0.642642208307, 0))
        make_face()
    extrude(amount=5)
    # the kernel refuses this fillet: 10 mm, written as the material it takes off along each edge
    with BuildSketch(Plane(origin=(15, 97.969786151, -26.348480035), x_dir=(-1, 0, 0), z_dir=(0, 0, 1)), Plane(origin=(-97.969786151, 15, -26.348480035), x_dir=(0, -1, 0), z_dir=(0, 0, 1)), Plane(origin=(-15, -97.969786151, -26.348480035), x_dir=(1, 0, 0), z_dir=(0, 0, 1)), Plane(origin=(97.969786151, -15, -26.348480035), x_dir=(0, 1, 0), z_dir=(0, 0, 1))) as fillet1_2_piece_1:
        with BuildLine():
            CenterArc((9.539392014, 10), FILLET1_R, 197.457603124, 72.542396876)
            Line((0, 7), (0, 0))
            Line((0, 0), (9.539392014, 0))
        make_face()
    extrude(amount=52.696960071, mode=Mode.SUBTRACT)
    with BuildSketch(Plane(origin=(-15, 97.969786151, -26.348480035), x_dir=(0, -1, 0), z_dir=(0, 0, 1)), Plane(origin=(-97.969786151, -15, -26.348480035), x_dir=(1, 0, 0), z_dir=(0, 0, 1)), Plane(origin=(15, -97.969786151, -26.348480035), x_dir=(0, 1, 0), z_dir=(0, 0, 1)), Plane(origin=(97.969786151, 15, -26.348480035), x_dir=(-1, 0, 0), z_dir=(0, 0, 1))) as fillet1_2_piece_2:
        with BuildLine():
            CenterArc((10, 9.539392014), FILLET1_R, 180, 72.542396876)
            Line((0, 9.539392014), (0, 0))
            Line((0, 0), (7, 0))
        make_face()
    extrude(amount=52.696960071, mode=Mode.SUBTRACT)

    # Fillet3
    fillet3_edges = [part.edges().sort_by_distance(p)[0] for p in [
        (-75, 75, -5.5),
        (75, 75, -3),
        (75, -75, -3),
        (-75, -75, -5.5),
    ]]
    fillet(fillet3_edges, radius=FILLET3_R)

    # Sketch9 → Cut-Extrude4 (cut, symmetric)
    with BuildSketch(Plane.XY):
        with Locations((-60, 65)):
            Circle(SKETCH9_R)
        with Locations((-60, 15)):
            Circle(SKETCH9_R)
        with Locations((60, 15)):
            Circle(SKETCH9_R)
        with Locations((60, 65)):
            Circle(SKETCH9_R)
        with Locations((67.5, 40)):
            Circle(SKETCH9_R)
        with Locations((-67.5, 40)):
            Circle(SKETCH9_R)
        with Locations((-60, -15)):
            Circle(SKETCH9_R)
        with Locations((60, -15)):
            Circle(SKETCH9_R)
        with Locations((-60, -65)):
            Circle(SKETCH9_R)
        with Locations((-67.5, -40)):
            Circle(SKETCH9_R)
        with Locations((60, -65)):
            Circle(SKETCH9_R)
        with Locations((67.5, -40)):
            Circle(SKETCH9_R)
    extrude(amount=CUT_EXTRUDE4_DEPTH, both=True, mode=Mode.SUBTRACT)


solid = part.part
